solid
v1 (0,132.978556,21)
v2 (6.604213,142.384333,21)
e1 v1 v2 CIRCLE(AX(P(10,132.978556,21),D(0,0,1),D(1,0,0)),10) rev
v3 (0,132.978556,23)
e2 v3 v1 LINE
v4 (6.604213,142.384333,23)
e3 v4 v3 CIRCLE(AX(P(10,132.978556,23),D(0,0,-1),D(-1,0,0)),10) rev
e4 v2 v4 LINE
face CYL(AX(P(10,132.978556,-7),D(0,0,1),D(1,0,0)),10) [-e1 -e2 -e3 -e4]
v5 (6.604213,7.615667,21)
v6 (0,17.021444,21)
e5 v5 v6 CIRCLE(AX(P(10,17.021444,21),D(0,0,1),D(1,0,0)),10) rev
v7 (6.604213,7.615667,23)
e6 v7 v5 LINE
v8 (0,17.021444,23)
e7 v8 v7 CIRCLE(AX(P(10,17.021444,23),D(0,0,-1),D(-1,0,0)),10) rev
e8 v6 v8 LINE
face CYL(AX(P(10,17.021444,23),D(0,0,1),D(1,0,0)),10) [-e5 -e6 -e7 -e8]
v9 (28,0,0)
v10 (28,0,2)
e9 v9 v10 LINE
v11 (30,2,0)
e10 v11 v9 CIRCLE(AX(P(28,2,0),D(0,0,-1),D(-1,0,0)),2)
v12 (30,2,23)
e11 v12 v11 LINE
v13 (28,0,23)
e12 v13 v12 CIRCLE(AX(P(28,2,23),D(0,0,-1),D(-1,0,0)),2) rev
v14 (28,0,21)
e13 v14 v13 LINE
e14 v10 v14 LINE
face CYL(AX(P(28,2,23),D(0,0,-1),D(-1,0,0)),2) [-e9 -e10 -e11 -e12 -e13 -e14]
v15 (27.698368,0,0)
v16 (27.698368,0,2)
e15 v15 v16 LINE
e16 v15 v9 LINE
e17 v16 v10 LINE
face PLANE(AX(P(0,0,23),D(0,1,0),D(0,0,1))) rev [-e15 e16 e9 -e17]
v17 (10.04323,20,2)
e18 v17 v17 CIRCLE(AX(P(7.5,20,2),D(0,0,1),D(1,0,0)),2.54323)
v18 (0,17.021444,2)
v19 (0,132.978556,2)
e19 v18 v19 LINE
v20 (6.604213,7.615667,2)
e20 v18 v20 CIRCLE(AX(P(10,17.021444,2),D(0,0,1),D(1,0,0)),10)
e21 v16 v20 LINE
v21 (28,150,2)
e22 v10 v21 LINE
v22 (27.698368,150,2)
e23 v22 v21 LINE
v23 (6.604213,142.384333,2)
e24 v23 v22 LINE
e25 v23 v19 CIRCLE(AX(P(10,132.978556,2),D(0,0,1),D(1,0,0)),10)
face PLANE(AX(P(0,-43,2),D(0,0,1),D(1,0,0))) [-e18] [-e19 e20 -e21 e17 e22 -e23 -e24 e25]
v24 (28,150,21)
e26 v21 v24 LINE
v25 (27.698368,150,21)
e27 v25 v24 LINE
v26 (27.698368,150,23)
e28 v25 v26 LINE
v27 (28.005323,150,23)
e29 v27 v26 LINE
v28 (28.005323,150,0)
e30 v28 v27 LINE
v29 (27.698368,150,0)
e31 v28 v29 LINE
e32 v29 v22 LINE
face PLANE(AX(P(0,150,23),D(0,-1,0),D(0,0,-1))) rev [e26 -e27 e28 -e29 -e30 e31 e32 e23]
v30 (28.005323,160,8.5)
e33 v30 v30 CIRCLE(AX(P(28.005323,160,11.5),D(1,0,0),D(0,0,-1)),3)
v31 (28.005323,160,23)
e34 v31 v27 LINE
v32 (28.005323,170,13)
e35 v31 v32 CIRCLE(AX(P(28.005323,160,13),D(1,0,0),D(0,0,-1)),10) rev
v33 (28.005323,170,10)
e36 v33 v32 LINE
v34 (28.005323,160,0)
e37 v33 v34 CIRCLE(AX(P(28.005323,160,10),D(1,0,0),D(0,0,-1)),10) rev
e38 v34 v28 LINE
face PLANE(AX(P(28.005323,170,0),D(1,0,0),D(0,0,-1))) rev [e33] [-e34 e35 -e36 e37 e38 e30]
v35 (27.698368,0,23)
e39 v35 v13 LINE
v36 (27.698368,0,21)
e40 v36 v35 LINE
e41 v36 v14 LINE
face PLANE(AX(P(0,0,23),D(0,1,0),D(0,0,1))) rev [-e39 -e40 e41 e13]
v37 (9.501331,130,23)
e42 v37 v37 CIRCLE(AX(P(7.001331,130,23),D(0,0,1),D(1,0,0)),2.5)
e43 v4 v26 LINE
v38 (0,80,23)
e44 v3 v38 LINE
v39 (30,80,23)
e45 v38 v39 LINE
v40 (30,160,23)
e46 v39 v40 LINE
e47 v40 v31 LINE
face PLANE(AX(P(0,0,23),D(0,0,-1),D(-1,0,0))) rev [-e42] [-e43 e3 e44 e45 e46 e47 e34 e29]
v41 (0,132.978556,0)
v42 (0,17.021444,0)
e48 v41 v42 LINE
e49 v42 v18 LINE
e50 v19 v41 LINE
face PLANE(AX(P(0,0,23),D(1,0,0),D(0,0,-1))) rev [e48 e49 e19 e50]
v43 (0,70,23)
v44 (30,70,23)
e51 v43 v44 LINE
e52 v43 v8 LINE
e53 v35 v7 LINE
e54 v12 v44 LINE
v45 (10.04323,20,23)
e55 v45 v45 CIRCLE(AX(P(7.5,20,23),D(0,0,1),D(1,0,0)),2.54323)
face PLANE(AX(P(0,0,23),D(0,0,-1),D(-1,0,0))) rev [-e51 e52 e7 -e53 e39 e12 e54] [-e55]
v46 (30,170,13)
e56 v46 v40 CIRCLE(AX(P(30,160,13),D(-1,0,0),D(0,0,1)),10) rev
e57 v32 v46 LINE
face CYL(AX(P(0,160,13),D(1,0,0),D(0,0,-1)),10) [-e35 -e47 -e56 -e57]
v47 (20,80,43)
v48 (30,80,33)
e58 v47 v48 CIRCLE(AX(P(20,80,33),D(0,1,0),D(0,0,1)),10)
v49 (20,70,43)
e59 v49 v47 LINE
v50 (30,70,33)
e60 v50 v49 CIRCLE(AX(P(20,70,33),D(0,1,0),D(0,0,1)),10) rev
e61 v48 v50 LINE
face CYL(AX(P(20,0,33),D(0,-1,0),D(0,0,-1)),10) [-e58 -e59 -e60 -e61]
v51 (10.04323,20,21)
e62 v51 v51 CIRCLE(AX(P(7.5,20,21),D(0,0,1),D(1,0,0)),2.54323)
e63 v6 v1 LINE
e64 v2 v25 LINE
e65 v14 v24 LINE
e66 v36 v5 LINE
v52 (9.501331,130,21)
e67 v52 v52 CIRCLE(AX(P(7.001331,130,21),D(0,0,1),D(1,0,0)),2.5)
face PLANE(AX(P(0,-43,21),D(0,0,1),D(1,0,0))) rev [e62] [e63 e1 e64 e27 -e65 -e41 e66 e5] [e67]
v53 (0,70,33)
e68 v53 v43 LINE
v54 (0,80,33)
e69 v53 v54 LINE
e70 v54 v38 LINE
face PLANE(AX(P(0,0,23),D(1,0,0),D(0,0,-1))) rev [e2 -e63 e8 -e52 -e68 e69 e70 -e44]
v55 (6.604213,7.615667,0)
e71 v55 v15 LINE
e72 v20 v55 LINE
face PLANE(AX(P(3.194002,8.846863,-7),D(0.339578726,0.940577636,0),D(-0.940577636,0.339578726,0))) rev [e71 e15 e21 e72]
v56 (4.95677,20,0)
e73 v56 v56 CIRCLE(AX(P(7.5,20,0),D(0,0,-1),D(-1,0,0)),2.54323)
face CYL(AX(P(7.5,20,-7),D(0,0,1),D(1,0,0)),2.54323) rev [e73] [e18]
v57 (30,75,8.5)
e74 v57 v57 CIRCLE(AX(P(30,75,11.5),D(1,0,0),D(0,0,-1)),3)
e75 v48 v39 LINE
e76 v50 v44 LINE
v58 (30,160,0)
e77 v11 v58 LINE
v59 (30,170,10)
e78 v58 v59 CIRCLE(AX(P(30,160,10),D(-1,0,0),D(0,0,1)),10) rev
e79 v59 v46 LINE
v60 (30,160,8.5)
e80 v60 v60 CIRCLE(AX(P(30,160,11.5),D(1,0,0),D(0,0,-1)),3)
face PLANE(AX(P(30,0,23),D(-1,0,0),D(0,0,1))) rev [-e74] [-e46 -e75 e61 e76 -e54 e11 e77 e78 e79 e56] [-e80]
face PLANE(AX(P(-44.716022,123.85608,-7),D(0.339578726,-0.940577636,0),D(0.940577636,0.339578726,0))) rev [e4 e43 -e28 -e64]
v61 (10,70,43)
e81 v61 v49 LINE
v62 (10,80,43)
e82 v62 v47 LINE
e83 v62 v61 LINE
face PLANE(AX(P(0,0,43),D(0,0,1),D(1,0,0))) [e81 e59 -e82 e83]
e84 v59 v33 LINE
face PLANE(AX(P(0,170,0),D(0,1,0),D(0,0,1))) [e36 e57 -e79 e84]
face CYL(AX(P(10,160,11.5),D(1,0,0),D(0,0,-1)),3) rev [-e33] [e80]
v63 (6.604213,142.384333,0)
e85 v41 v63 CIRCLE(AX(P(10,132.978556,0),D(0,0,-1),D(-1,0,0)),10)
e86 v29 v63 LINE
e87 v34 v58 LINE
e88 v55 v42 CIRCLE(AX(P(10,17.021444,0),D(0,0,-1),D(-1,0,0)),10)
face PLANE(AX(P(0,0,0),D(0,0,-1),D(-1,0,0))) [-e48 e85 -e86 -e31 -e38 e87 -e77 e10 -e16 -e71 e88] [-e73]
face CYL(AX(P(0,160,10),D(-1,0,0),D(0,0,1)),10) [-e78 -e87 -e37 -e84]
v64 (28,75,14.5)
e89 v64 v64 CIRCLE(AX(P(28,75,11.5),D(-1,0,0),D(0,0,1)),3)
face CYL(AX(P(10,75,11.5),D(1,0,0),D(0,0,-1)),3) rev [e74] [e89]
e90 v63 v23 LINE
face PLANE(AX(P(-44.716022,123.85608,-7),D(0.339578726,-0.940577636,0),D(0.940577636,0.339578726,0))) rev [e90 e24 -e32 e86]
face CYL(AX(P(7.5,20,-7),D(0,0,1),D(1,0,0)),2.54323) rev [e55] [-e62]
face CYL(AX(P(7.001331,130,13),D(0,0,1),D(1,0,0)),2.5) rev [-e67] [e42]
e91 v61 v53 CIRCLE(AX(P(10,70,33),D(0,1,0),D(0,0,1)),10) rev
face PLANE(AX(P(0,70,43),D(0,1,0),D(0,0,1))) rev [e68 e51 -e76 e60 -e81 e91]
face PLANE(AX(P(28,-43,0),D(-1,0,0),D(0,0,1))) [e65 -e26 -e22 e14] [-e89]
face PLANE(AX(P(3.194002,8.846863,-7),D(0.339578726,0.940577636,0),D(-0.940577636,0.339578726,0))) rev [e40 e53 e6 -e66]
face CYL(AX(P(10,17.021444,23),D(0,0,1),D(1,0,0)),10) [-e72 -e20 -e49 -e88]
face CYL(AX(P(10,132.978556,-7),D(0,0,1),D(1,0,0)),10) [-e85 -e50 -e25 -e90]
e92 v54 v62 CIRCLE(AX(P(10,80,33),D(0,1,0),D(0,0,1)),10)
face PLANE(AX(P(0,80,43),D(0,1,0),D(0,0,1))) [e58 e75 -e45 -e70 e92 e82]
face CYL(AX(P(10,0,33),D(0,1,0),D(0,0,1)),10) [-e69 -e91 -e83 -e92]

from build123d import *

# Parameters (mm, degrees)
SKETCH1_W           = 30
SKETCH1_H           = 150
BOSS_EXTRUDE2_DEPTH = 23
SKETCH3_W           = 28
SKETCH3_H           = 19
CUT_EXTRUDE1_DEPTH  = 193
SKETCH7_W           = 1.99467658
SKETCH7_H           = 23
BOSS_EXTRUDE4_DEPTH = 20
CUT_EXTRUDE2_DEPTH  = 20
SKETCH9_W           = 30
SKETCH9_H           = 10
BOSS_EXTRUDE5_DEPTH = 20
SKETCH11_R          = 2.5
CUT_EXTRUDE4_DEPTH  = 10
CUT_EXTRUDE5_DEPTH  = 30
FILLET1_R           = 10
SKETCH13_R          = 2.543230184
CUT_EXTRUDE6_DEPTH  = 30
FILLET2_R           = 10
FILLET3_R           = 10
FILLET4_R           = 2


with BuildPart() as part:
    # Sketch1 → Boss-Extrude2 (new body)
    with BuildSketch(Plane.XY):
        with Locations((15, 75)):
            Rectangle(SKETCH1_W, SKETCH1_H)
    extrude(amount=BOSS_EXTRUDE2_DEPTH)

    # Sketch3 → Cut-Extrude1 (cut)
    with BuildSketch(Plane(origin=(0, 150, 0), x_dir=(1, 0, 0), z_dir=(0, 1, 0))):
        with Locations((14, -11.5)):
            Rectangle(SKETCH3_W, SKETCH3_H)
    extrude(amount=-CUT_EXTRUDE1_DEPTH, mode=Mode.SUBTRACT)

    # Sketch7 → Boss-Extrude4 (add)
    with BuildSketch(Plane(origin=(0, 150, 0), x_dir=(1, 0, 0), z_dir=(0, 1, 0))):
        with Locations((29.00266171, -11.5)):
            Rectangle(SKETCH7_W, SKETCH7_H)
    extrude(amount=BOSS_EXTRUDE4_DEPTH)

    # Sketch8 → Cut-Extrude2 (cut)
    with BuildSketch(Plane(origin=(30, 0, 0), x_dir=(0, 0, -1), z_dir=(1, 0, 0))):
        with BuildLine():
            ThreePointArc((-11.5, 78), (-14.5, 75), (-11.5, 72))
            Line((-11.5, 72), (-11.5, 78))
        make_face()
        with BuildLine():
            Line((-11.5, 78), (-11.5, 72))
            ThreePointArc((-11.5, 72), (-9.378679656, 72.878679656), (-8.5, 75))
            ThreePointArc((-8.5, 75), (-9.378679656, 77.121320344), (-11.5, 78))
        make_face()
        with BuildLine():
            ThreePointArc((-13.763816566, 158.031463855), (-11.5, 157), (-9.236183434, 158.031463855))
            Line((-9.236183434, 158.031463855), (-11.5, 160))
            Line((-11.5, 160), (-13.763816566, 158.031463855))
        make_face()
        with BuildLine():
            Line((-11.5, 160), (-9.236183434, 158.031463855))
            ThreePointArc((-9.236183434, 158.031463855), (-8.690066754, 158.94915503), (-8.5, 160))
            ThreePointArc((-8.5, 160), (-8.690066754, 161.05084497), (-9.236183434, 161.968536145))
            Line((-9.236183434, 161.968536145), (-11.5, 160))
        make_face()
        with BuildLine():
            ThreePointArc((-13.763816566, 161.968536145), (-14.5, 160), (-13.763816566, 158.031463855))
            Line((-13.763816566, 158.031463855), (-11.5, 160))
            Line((-11.5, 160), (-13.763816566, 161.968536145))
        make_face()
        with BuildLine():
            Line((-11.5, 160), (-9.236183434, 161.968536145))
            ThreePointArc((-9.236183434, 161.968536145), (-11.5, 163), (-13.763816566, 161.968536145))
            Line((-13.763816566, 161.968536145), (-11.5, 160))
        make_face()
    extrude(amount=-CUT_EXTRUDE2_DEPTH, mode=Mode.SUBTRACT)

    # Sketch9 → Boss-Extrude5 (add)
    with BuildSketch(Plane.XY.offset(23)):
        with Locations((15, 75)):
            Rectangle(SKETCH9_W, SKETCH9_H)
    extrude(amount=BOSS_EXTRUDE5_DEPTH)

    # Sketch11 → Cut-Extrude4 (cut)
    with BuildSketch(Plane.XY.offset(23)):
        with Locations((7.001330855, 130)):
            Circle(SKETCH11_R)
        with Locations((7.5, 20)):
            Circle(SKETCH11_R)
    extrude(amount=-CUT_EXTRUDE4_DEPTH, mode=Mode.SUBTRACT)

    # Sketch12 → Cut-Extrude5 (cut)
    with BuildSketch(Plane.XY.offset(23)):
        Polygon((27.698367508, 150), (0, 150), (0, 140), align=None)
        Polygon((0, 0), (0, 10), (27.698367508, 0), align=None)
    extrude(amount=-CUT_EXTRUDE5_DEPTH, mode=Mode.SUBTRACT)

    # Fillet1
    fillet1_edges = [part.edges().sort_by_distance(p)[0] for p in [
        (0, 140, 1),
        (0, 10, 22),
        (0, 10, 1),
        (0, 140, 22),
    ]]
    fillet(fillet1_edges, radius=FILLET1_R)

    # Sketch13 → Cut-Extrude6 (cut)
    with BuildSketch(Plane.XY.offset(23)):
        with Locations((7.5, 20)):
            Circle(SKETCH13_R)
    extrude(amount=-CUT_EXTRUDE6_DEPTH, mode=Mode.SUBTRACT)

    # Fillet2
    fillet2_edges = [part.edges().sort_by_distance(p)[0] for p in [
        (0, 75, 43),
        (30, 75, 43),
    ]]
    fillet(fillet2_edges, radius=FILLET2_R)

    # Fillet3
    fillet3_edges = [part.edges().sort_by_distance(p)[0] for p in [
        (29.00266171, 170, 23),
        (29.00266171, 170, 0),
    ]]
    fillet(fillet3_edges, radius=FILLET3_R)

    # Fillet4
    fillet4_edges = [part.edges().sort_by_distance(p)[0] for p in [
        (30, 0, 11.5),
    ]]
    fillet(fillet4_edges, radius=FILLET4_R - 0.0001)  # a hair under: the kernel refuses the full size


solid = part.part
